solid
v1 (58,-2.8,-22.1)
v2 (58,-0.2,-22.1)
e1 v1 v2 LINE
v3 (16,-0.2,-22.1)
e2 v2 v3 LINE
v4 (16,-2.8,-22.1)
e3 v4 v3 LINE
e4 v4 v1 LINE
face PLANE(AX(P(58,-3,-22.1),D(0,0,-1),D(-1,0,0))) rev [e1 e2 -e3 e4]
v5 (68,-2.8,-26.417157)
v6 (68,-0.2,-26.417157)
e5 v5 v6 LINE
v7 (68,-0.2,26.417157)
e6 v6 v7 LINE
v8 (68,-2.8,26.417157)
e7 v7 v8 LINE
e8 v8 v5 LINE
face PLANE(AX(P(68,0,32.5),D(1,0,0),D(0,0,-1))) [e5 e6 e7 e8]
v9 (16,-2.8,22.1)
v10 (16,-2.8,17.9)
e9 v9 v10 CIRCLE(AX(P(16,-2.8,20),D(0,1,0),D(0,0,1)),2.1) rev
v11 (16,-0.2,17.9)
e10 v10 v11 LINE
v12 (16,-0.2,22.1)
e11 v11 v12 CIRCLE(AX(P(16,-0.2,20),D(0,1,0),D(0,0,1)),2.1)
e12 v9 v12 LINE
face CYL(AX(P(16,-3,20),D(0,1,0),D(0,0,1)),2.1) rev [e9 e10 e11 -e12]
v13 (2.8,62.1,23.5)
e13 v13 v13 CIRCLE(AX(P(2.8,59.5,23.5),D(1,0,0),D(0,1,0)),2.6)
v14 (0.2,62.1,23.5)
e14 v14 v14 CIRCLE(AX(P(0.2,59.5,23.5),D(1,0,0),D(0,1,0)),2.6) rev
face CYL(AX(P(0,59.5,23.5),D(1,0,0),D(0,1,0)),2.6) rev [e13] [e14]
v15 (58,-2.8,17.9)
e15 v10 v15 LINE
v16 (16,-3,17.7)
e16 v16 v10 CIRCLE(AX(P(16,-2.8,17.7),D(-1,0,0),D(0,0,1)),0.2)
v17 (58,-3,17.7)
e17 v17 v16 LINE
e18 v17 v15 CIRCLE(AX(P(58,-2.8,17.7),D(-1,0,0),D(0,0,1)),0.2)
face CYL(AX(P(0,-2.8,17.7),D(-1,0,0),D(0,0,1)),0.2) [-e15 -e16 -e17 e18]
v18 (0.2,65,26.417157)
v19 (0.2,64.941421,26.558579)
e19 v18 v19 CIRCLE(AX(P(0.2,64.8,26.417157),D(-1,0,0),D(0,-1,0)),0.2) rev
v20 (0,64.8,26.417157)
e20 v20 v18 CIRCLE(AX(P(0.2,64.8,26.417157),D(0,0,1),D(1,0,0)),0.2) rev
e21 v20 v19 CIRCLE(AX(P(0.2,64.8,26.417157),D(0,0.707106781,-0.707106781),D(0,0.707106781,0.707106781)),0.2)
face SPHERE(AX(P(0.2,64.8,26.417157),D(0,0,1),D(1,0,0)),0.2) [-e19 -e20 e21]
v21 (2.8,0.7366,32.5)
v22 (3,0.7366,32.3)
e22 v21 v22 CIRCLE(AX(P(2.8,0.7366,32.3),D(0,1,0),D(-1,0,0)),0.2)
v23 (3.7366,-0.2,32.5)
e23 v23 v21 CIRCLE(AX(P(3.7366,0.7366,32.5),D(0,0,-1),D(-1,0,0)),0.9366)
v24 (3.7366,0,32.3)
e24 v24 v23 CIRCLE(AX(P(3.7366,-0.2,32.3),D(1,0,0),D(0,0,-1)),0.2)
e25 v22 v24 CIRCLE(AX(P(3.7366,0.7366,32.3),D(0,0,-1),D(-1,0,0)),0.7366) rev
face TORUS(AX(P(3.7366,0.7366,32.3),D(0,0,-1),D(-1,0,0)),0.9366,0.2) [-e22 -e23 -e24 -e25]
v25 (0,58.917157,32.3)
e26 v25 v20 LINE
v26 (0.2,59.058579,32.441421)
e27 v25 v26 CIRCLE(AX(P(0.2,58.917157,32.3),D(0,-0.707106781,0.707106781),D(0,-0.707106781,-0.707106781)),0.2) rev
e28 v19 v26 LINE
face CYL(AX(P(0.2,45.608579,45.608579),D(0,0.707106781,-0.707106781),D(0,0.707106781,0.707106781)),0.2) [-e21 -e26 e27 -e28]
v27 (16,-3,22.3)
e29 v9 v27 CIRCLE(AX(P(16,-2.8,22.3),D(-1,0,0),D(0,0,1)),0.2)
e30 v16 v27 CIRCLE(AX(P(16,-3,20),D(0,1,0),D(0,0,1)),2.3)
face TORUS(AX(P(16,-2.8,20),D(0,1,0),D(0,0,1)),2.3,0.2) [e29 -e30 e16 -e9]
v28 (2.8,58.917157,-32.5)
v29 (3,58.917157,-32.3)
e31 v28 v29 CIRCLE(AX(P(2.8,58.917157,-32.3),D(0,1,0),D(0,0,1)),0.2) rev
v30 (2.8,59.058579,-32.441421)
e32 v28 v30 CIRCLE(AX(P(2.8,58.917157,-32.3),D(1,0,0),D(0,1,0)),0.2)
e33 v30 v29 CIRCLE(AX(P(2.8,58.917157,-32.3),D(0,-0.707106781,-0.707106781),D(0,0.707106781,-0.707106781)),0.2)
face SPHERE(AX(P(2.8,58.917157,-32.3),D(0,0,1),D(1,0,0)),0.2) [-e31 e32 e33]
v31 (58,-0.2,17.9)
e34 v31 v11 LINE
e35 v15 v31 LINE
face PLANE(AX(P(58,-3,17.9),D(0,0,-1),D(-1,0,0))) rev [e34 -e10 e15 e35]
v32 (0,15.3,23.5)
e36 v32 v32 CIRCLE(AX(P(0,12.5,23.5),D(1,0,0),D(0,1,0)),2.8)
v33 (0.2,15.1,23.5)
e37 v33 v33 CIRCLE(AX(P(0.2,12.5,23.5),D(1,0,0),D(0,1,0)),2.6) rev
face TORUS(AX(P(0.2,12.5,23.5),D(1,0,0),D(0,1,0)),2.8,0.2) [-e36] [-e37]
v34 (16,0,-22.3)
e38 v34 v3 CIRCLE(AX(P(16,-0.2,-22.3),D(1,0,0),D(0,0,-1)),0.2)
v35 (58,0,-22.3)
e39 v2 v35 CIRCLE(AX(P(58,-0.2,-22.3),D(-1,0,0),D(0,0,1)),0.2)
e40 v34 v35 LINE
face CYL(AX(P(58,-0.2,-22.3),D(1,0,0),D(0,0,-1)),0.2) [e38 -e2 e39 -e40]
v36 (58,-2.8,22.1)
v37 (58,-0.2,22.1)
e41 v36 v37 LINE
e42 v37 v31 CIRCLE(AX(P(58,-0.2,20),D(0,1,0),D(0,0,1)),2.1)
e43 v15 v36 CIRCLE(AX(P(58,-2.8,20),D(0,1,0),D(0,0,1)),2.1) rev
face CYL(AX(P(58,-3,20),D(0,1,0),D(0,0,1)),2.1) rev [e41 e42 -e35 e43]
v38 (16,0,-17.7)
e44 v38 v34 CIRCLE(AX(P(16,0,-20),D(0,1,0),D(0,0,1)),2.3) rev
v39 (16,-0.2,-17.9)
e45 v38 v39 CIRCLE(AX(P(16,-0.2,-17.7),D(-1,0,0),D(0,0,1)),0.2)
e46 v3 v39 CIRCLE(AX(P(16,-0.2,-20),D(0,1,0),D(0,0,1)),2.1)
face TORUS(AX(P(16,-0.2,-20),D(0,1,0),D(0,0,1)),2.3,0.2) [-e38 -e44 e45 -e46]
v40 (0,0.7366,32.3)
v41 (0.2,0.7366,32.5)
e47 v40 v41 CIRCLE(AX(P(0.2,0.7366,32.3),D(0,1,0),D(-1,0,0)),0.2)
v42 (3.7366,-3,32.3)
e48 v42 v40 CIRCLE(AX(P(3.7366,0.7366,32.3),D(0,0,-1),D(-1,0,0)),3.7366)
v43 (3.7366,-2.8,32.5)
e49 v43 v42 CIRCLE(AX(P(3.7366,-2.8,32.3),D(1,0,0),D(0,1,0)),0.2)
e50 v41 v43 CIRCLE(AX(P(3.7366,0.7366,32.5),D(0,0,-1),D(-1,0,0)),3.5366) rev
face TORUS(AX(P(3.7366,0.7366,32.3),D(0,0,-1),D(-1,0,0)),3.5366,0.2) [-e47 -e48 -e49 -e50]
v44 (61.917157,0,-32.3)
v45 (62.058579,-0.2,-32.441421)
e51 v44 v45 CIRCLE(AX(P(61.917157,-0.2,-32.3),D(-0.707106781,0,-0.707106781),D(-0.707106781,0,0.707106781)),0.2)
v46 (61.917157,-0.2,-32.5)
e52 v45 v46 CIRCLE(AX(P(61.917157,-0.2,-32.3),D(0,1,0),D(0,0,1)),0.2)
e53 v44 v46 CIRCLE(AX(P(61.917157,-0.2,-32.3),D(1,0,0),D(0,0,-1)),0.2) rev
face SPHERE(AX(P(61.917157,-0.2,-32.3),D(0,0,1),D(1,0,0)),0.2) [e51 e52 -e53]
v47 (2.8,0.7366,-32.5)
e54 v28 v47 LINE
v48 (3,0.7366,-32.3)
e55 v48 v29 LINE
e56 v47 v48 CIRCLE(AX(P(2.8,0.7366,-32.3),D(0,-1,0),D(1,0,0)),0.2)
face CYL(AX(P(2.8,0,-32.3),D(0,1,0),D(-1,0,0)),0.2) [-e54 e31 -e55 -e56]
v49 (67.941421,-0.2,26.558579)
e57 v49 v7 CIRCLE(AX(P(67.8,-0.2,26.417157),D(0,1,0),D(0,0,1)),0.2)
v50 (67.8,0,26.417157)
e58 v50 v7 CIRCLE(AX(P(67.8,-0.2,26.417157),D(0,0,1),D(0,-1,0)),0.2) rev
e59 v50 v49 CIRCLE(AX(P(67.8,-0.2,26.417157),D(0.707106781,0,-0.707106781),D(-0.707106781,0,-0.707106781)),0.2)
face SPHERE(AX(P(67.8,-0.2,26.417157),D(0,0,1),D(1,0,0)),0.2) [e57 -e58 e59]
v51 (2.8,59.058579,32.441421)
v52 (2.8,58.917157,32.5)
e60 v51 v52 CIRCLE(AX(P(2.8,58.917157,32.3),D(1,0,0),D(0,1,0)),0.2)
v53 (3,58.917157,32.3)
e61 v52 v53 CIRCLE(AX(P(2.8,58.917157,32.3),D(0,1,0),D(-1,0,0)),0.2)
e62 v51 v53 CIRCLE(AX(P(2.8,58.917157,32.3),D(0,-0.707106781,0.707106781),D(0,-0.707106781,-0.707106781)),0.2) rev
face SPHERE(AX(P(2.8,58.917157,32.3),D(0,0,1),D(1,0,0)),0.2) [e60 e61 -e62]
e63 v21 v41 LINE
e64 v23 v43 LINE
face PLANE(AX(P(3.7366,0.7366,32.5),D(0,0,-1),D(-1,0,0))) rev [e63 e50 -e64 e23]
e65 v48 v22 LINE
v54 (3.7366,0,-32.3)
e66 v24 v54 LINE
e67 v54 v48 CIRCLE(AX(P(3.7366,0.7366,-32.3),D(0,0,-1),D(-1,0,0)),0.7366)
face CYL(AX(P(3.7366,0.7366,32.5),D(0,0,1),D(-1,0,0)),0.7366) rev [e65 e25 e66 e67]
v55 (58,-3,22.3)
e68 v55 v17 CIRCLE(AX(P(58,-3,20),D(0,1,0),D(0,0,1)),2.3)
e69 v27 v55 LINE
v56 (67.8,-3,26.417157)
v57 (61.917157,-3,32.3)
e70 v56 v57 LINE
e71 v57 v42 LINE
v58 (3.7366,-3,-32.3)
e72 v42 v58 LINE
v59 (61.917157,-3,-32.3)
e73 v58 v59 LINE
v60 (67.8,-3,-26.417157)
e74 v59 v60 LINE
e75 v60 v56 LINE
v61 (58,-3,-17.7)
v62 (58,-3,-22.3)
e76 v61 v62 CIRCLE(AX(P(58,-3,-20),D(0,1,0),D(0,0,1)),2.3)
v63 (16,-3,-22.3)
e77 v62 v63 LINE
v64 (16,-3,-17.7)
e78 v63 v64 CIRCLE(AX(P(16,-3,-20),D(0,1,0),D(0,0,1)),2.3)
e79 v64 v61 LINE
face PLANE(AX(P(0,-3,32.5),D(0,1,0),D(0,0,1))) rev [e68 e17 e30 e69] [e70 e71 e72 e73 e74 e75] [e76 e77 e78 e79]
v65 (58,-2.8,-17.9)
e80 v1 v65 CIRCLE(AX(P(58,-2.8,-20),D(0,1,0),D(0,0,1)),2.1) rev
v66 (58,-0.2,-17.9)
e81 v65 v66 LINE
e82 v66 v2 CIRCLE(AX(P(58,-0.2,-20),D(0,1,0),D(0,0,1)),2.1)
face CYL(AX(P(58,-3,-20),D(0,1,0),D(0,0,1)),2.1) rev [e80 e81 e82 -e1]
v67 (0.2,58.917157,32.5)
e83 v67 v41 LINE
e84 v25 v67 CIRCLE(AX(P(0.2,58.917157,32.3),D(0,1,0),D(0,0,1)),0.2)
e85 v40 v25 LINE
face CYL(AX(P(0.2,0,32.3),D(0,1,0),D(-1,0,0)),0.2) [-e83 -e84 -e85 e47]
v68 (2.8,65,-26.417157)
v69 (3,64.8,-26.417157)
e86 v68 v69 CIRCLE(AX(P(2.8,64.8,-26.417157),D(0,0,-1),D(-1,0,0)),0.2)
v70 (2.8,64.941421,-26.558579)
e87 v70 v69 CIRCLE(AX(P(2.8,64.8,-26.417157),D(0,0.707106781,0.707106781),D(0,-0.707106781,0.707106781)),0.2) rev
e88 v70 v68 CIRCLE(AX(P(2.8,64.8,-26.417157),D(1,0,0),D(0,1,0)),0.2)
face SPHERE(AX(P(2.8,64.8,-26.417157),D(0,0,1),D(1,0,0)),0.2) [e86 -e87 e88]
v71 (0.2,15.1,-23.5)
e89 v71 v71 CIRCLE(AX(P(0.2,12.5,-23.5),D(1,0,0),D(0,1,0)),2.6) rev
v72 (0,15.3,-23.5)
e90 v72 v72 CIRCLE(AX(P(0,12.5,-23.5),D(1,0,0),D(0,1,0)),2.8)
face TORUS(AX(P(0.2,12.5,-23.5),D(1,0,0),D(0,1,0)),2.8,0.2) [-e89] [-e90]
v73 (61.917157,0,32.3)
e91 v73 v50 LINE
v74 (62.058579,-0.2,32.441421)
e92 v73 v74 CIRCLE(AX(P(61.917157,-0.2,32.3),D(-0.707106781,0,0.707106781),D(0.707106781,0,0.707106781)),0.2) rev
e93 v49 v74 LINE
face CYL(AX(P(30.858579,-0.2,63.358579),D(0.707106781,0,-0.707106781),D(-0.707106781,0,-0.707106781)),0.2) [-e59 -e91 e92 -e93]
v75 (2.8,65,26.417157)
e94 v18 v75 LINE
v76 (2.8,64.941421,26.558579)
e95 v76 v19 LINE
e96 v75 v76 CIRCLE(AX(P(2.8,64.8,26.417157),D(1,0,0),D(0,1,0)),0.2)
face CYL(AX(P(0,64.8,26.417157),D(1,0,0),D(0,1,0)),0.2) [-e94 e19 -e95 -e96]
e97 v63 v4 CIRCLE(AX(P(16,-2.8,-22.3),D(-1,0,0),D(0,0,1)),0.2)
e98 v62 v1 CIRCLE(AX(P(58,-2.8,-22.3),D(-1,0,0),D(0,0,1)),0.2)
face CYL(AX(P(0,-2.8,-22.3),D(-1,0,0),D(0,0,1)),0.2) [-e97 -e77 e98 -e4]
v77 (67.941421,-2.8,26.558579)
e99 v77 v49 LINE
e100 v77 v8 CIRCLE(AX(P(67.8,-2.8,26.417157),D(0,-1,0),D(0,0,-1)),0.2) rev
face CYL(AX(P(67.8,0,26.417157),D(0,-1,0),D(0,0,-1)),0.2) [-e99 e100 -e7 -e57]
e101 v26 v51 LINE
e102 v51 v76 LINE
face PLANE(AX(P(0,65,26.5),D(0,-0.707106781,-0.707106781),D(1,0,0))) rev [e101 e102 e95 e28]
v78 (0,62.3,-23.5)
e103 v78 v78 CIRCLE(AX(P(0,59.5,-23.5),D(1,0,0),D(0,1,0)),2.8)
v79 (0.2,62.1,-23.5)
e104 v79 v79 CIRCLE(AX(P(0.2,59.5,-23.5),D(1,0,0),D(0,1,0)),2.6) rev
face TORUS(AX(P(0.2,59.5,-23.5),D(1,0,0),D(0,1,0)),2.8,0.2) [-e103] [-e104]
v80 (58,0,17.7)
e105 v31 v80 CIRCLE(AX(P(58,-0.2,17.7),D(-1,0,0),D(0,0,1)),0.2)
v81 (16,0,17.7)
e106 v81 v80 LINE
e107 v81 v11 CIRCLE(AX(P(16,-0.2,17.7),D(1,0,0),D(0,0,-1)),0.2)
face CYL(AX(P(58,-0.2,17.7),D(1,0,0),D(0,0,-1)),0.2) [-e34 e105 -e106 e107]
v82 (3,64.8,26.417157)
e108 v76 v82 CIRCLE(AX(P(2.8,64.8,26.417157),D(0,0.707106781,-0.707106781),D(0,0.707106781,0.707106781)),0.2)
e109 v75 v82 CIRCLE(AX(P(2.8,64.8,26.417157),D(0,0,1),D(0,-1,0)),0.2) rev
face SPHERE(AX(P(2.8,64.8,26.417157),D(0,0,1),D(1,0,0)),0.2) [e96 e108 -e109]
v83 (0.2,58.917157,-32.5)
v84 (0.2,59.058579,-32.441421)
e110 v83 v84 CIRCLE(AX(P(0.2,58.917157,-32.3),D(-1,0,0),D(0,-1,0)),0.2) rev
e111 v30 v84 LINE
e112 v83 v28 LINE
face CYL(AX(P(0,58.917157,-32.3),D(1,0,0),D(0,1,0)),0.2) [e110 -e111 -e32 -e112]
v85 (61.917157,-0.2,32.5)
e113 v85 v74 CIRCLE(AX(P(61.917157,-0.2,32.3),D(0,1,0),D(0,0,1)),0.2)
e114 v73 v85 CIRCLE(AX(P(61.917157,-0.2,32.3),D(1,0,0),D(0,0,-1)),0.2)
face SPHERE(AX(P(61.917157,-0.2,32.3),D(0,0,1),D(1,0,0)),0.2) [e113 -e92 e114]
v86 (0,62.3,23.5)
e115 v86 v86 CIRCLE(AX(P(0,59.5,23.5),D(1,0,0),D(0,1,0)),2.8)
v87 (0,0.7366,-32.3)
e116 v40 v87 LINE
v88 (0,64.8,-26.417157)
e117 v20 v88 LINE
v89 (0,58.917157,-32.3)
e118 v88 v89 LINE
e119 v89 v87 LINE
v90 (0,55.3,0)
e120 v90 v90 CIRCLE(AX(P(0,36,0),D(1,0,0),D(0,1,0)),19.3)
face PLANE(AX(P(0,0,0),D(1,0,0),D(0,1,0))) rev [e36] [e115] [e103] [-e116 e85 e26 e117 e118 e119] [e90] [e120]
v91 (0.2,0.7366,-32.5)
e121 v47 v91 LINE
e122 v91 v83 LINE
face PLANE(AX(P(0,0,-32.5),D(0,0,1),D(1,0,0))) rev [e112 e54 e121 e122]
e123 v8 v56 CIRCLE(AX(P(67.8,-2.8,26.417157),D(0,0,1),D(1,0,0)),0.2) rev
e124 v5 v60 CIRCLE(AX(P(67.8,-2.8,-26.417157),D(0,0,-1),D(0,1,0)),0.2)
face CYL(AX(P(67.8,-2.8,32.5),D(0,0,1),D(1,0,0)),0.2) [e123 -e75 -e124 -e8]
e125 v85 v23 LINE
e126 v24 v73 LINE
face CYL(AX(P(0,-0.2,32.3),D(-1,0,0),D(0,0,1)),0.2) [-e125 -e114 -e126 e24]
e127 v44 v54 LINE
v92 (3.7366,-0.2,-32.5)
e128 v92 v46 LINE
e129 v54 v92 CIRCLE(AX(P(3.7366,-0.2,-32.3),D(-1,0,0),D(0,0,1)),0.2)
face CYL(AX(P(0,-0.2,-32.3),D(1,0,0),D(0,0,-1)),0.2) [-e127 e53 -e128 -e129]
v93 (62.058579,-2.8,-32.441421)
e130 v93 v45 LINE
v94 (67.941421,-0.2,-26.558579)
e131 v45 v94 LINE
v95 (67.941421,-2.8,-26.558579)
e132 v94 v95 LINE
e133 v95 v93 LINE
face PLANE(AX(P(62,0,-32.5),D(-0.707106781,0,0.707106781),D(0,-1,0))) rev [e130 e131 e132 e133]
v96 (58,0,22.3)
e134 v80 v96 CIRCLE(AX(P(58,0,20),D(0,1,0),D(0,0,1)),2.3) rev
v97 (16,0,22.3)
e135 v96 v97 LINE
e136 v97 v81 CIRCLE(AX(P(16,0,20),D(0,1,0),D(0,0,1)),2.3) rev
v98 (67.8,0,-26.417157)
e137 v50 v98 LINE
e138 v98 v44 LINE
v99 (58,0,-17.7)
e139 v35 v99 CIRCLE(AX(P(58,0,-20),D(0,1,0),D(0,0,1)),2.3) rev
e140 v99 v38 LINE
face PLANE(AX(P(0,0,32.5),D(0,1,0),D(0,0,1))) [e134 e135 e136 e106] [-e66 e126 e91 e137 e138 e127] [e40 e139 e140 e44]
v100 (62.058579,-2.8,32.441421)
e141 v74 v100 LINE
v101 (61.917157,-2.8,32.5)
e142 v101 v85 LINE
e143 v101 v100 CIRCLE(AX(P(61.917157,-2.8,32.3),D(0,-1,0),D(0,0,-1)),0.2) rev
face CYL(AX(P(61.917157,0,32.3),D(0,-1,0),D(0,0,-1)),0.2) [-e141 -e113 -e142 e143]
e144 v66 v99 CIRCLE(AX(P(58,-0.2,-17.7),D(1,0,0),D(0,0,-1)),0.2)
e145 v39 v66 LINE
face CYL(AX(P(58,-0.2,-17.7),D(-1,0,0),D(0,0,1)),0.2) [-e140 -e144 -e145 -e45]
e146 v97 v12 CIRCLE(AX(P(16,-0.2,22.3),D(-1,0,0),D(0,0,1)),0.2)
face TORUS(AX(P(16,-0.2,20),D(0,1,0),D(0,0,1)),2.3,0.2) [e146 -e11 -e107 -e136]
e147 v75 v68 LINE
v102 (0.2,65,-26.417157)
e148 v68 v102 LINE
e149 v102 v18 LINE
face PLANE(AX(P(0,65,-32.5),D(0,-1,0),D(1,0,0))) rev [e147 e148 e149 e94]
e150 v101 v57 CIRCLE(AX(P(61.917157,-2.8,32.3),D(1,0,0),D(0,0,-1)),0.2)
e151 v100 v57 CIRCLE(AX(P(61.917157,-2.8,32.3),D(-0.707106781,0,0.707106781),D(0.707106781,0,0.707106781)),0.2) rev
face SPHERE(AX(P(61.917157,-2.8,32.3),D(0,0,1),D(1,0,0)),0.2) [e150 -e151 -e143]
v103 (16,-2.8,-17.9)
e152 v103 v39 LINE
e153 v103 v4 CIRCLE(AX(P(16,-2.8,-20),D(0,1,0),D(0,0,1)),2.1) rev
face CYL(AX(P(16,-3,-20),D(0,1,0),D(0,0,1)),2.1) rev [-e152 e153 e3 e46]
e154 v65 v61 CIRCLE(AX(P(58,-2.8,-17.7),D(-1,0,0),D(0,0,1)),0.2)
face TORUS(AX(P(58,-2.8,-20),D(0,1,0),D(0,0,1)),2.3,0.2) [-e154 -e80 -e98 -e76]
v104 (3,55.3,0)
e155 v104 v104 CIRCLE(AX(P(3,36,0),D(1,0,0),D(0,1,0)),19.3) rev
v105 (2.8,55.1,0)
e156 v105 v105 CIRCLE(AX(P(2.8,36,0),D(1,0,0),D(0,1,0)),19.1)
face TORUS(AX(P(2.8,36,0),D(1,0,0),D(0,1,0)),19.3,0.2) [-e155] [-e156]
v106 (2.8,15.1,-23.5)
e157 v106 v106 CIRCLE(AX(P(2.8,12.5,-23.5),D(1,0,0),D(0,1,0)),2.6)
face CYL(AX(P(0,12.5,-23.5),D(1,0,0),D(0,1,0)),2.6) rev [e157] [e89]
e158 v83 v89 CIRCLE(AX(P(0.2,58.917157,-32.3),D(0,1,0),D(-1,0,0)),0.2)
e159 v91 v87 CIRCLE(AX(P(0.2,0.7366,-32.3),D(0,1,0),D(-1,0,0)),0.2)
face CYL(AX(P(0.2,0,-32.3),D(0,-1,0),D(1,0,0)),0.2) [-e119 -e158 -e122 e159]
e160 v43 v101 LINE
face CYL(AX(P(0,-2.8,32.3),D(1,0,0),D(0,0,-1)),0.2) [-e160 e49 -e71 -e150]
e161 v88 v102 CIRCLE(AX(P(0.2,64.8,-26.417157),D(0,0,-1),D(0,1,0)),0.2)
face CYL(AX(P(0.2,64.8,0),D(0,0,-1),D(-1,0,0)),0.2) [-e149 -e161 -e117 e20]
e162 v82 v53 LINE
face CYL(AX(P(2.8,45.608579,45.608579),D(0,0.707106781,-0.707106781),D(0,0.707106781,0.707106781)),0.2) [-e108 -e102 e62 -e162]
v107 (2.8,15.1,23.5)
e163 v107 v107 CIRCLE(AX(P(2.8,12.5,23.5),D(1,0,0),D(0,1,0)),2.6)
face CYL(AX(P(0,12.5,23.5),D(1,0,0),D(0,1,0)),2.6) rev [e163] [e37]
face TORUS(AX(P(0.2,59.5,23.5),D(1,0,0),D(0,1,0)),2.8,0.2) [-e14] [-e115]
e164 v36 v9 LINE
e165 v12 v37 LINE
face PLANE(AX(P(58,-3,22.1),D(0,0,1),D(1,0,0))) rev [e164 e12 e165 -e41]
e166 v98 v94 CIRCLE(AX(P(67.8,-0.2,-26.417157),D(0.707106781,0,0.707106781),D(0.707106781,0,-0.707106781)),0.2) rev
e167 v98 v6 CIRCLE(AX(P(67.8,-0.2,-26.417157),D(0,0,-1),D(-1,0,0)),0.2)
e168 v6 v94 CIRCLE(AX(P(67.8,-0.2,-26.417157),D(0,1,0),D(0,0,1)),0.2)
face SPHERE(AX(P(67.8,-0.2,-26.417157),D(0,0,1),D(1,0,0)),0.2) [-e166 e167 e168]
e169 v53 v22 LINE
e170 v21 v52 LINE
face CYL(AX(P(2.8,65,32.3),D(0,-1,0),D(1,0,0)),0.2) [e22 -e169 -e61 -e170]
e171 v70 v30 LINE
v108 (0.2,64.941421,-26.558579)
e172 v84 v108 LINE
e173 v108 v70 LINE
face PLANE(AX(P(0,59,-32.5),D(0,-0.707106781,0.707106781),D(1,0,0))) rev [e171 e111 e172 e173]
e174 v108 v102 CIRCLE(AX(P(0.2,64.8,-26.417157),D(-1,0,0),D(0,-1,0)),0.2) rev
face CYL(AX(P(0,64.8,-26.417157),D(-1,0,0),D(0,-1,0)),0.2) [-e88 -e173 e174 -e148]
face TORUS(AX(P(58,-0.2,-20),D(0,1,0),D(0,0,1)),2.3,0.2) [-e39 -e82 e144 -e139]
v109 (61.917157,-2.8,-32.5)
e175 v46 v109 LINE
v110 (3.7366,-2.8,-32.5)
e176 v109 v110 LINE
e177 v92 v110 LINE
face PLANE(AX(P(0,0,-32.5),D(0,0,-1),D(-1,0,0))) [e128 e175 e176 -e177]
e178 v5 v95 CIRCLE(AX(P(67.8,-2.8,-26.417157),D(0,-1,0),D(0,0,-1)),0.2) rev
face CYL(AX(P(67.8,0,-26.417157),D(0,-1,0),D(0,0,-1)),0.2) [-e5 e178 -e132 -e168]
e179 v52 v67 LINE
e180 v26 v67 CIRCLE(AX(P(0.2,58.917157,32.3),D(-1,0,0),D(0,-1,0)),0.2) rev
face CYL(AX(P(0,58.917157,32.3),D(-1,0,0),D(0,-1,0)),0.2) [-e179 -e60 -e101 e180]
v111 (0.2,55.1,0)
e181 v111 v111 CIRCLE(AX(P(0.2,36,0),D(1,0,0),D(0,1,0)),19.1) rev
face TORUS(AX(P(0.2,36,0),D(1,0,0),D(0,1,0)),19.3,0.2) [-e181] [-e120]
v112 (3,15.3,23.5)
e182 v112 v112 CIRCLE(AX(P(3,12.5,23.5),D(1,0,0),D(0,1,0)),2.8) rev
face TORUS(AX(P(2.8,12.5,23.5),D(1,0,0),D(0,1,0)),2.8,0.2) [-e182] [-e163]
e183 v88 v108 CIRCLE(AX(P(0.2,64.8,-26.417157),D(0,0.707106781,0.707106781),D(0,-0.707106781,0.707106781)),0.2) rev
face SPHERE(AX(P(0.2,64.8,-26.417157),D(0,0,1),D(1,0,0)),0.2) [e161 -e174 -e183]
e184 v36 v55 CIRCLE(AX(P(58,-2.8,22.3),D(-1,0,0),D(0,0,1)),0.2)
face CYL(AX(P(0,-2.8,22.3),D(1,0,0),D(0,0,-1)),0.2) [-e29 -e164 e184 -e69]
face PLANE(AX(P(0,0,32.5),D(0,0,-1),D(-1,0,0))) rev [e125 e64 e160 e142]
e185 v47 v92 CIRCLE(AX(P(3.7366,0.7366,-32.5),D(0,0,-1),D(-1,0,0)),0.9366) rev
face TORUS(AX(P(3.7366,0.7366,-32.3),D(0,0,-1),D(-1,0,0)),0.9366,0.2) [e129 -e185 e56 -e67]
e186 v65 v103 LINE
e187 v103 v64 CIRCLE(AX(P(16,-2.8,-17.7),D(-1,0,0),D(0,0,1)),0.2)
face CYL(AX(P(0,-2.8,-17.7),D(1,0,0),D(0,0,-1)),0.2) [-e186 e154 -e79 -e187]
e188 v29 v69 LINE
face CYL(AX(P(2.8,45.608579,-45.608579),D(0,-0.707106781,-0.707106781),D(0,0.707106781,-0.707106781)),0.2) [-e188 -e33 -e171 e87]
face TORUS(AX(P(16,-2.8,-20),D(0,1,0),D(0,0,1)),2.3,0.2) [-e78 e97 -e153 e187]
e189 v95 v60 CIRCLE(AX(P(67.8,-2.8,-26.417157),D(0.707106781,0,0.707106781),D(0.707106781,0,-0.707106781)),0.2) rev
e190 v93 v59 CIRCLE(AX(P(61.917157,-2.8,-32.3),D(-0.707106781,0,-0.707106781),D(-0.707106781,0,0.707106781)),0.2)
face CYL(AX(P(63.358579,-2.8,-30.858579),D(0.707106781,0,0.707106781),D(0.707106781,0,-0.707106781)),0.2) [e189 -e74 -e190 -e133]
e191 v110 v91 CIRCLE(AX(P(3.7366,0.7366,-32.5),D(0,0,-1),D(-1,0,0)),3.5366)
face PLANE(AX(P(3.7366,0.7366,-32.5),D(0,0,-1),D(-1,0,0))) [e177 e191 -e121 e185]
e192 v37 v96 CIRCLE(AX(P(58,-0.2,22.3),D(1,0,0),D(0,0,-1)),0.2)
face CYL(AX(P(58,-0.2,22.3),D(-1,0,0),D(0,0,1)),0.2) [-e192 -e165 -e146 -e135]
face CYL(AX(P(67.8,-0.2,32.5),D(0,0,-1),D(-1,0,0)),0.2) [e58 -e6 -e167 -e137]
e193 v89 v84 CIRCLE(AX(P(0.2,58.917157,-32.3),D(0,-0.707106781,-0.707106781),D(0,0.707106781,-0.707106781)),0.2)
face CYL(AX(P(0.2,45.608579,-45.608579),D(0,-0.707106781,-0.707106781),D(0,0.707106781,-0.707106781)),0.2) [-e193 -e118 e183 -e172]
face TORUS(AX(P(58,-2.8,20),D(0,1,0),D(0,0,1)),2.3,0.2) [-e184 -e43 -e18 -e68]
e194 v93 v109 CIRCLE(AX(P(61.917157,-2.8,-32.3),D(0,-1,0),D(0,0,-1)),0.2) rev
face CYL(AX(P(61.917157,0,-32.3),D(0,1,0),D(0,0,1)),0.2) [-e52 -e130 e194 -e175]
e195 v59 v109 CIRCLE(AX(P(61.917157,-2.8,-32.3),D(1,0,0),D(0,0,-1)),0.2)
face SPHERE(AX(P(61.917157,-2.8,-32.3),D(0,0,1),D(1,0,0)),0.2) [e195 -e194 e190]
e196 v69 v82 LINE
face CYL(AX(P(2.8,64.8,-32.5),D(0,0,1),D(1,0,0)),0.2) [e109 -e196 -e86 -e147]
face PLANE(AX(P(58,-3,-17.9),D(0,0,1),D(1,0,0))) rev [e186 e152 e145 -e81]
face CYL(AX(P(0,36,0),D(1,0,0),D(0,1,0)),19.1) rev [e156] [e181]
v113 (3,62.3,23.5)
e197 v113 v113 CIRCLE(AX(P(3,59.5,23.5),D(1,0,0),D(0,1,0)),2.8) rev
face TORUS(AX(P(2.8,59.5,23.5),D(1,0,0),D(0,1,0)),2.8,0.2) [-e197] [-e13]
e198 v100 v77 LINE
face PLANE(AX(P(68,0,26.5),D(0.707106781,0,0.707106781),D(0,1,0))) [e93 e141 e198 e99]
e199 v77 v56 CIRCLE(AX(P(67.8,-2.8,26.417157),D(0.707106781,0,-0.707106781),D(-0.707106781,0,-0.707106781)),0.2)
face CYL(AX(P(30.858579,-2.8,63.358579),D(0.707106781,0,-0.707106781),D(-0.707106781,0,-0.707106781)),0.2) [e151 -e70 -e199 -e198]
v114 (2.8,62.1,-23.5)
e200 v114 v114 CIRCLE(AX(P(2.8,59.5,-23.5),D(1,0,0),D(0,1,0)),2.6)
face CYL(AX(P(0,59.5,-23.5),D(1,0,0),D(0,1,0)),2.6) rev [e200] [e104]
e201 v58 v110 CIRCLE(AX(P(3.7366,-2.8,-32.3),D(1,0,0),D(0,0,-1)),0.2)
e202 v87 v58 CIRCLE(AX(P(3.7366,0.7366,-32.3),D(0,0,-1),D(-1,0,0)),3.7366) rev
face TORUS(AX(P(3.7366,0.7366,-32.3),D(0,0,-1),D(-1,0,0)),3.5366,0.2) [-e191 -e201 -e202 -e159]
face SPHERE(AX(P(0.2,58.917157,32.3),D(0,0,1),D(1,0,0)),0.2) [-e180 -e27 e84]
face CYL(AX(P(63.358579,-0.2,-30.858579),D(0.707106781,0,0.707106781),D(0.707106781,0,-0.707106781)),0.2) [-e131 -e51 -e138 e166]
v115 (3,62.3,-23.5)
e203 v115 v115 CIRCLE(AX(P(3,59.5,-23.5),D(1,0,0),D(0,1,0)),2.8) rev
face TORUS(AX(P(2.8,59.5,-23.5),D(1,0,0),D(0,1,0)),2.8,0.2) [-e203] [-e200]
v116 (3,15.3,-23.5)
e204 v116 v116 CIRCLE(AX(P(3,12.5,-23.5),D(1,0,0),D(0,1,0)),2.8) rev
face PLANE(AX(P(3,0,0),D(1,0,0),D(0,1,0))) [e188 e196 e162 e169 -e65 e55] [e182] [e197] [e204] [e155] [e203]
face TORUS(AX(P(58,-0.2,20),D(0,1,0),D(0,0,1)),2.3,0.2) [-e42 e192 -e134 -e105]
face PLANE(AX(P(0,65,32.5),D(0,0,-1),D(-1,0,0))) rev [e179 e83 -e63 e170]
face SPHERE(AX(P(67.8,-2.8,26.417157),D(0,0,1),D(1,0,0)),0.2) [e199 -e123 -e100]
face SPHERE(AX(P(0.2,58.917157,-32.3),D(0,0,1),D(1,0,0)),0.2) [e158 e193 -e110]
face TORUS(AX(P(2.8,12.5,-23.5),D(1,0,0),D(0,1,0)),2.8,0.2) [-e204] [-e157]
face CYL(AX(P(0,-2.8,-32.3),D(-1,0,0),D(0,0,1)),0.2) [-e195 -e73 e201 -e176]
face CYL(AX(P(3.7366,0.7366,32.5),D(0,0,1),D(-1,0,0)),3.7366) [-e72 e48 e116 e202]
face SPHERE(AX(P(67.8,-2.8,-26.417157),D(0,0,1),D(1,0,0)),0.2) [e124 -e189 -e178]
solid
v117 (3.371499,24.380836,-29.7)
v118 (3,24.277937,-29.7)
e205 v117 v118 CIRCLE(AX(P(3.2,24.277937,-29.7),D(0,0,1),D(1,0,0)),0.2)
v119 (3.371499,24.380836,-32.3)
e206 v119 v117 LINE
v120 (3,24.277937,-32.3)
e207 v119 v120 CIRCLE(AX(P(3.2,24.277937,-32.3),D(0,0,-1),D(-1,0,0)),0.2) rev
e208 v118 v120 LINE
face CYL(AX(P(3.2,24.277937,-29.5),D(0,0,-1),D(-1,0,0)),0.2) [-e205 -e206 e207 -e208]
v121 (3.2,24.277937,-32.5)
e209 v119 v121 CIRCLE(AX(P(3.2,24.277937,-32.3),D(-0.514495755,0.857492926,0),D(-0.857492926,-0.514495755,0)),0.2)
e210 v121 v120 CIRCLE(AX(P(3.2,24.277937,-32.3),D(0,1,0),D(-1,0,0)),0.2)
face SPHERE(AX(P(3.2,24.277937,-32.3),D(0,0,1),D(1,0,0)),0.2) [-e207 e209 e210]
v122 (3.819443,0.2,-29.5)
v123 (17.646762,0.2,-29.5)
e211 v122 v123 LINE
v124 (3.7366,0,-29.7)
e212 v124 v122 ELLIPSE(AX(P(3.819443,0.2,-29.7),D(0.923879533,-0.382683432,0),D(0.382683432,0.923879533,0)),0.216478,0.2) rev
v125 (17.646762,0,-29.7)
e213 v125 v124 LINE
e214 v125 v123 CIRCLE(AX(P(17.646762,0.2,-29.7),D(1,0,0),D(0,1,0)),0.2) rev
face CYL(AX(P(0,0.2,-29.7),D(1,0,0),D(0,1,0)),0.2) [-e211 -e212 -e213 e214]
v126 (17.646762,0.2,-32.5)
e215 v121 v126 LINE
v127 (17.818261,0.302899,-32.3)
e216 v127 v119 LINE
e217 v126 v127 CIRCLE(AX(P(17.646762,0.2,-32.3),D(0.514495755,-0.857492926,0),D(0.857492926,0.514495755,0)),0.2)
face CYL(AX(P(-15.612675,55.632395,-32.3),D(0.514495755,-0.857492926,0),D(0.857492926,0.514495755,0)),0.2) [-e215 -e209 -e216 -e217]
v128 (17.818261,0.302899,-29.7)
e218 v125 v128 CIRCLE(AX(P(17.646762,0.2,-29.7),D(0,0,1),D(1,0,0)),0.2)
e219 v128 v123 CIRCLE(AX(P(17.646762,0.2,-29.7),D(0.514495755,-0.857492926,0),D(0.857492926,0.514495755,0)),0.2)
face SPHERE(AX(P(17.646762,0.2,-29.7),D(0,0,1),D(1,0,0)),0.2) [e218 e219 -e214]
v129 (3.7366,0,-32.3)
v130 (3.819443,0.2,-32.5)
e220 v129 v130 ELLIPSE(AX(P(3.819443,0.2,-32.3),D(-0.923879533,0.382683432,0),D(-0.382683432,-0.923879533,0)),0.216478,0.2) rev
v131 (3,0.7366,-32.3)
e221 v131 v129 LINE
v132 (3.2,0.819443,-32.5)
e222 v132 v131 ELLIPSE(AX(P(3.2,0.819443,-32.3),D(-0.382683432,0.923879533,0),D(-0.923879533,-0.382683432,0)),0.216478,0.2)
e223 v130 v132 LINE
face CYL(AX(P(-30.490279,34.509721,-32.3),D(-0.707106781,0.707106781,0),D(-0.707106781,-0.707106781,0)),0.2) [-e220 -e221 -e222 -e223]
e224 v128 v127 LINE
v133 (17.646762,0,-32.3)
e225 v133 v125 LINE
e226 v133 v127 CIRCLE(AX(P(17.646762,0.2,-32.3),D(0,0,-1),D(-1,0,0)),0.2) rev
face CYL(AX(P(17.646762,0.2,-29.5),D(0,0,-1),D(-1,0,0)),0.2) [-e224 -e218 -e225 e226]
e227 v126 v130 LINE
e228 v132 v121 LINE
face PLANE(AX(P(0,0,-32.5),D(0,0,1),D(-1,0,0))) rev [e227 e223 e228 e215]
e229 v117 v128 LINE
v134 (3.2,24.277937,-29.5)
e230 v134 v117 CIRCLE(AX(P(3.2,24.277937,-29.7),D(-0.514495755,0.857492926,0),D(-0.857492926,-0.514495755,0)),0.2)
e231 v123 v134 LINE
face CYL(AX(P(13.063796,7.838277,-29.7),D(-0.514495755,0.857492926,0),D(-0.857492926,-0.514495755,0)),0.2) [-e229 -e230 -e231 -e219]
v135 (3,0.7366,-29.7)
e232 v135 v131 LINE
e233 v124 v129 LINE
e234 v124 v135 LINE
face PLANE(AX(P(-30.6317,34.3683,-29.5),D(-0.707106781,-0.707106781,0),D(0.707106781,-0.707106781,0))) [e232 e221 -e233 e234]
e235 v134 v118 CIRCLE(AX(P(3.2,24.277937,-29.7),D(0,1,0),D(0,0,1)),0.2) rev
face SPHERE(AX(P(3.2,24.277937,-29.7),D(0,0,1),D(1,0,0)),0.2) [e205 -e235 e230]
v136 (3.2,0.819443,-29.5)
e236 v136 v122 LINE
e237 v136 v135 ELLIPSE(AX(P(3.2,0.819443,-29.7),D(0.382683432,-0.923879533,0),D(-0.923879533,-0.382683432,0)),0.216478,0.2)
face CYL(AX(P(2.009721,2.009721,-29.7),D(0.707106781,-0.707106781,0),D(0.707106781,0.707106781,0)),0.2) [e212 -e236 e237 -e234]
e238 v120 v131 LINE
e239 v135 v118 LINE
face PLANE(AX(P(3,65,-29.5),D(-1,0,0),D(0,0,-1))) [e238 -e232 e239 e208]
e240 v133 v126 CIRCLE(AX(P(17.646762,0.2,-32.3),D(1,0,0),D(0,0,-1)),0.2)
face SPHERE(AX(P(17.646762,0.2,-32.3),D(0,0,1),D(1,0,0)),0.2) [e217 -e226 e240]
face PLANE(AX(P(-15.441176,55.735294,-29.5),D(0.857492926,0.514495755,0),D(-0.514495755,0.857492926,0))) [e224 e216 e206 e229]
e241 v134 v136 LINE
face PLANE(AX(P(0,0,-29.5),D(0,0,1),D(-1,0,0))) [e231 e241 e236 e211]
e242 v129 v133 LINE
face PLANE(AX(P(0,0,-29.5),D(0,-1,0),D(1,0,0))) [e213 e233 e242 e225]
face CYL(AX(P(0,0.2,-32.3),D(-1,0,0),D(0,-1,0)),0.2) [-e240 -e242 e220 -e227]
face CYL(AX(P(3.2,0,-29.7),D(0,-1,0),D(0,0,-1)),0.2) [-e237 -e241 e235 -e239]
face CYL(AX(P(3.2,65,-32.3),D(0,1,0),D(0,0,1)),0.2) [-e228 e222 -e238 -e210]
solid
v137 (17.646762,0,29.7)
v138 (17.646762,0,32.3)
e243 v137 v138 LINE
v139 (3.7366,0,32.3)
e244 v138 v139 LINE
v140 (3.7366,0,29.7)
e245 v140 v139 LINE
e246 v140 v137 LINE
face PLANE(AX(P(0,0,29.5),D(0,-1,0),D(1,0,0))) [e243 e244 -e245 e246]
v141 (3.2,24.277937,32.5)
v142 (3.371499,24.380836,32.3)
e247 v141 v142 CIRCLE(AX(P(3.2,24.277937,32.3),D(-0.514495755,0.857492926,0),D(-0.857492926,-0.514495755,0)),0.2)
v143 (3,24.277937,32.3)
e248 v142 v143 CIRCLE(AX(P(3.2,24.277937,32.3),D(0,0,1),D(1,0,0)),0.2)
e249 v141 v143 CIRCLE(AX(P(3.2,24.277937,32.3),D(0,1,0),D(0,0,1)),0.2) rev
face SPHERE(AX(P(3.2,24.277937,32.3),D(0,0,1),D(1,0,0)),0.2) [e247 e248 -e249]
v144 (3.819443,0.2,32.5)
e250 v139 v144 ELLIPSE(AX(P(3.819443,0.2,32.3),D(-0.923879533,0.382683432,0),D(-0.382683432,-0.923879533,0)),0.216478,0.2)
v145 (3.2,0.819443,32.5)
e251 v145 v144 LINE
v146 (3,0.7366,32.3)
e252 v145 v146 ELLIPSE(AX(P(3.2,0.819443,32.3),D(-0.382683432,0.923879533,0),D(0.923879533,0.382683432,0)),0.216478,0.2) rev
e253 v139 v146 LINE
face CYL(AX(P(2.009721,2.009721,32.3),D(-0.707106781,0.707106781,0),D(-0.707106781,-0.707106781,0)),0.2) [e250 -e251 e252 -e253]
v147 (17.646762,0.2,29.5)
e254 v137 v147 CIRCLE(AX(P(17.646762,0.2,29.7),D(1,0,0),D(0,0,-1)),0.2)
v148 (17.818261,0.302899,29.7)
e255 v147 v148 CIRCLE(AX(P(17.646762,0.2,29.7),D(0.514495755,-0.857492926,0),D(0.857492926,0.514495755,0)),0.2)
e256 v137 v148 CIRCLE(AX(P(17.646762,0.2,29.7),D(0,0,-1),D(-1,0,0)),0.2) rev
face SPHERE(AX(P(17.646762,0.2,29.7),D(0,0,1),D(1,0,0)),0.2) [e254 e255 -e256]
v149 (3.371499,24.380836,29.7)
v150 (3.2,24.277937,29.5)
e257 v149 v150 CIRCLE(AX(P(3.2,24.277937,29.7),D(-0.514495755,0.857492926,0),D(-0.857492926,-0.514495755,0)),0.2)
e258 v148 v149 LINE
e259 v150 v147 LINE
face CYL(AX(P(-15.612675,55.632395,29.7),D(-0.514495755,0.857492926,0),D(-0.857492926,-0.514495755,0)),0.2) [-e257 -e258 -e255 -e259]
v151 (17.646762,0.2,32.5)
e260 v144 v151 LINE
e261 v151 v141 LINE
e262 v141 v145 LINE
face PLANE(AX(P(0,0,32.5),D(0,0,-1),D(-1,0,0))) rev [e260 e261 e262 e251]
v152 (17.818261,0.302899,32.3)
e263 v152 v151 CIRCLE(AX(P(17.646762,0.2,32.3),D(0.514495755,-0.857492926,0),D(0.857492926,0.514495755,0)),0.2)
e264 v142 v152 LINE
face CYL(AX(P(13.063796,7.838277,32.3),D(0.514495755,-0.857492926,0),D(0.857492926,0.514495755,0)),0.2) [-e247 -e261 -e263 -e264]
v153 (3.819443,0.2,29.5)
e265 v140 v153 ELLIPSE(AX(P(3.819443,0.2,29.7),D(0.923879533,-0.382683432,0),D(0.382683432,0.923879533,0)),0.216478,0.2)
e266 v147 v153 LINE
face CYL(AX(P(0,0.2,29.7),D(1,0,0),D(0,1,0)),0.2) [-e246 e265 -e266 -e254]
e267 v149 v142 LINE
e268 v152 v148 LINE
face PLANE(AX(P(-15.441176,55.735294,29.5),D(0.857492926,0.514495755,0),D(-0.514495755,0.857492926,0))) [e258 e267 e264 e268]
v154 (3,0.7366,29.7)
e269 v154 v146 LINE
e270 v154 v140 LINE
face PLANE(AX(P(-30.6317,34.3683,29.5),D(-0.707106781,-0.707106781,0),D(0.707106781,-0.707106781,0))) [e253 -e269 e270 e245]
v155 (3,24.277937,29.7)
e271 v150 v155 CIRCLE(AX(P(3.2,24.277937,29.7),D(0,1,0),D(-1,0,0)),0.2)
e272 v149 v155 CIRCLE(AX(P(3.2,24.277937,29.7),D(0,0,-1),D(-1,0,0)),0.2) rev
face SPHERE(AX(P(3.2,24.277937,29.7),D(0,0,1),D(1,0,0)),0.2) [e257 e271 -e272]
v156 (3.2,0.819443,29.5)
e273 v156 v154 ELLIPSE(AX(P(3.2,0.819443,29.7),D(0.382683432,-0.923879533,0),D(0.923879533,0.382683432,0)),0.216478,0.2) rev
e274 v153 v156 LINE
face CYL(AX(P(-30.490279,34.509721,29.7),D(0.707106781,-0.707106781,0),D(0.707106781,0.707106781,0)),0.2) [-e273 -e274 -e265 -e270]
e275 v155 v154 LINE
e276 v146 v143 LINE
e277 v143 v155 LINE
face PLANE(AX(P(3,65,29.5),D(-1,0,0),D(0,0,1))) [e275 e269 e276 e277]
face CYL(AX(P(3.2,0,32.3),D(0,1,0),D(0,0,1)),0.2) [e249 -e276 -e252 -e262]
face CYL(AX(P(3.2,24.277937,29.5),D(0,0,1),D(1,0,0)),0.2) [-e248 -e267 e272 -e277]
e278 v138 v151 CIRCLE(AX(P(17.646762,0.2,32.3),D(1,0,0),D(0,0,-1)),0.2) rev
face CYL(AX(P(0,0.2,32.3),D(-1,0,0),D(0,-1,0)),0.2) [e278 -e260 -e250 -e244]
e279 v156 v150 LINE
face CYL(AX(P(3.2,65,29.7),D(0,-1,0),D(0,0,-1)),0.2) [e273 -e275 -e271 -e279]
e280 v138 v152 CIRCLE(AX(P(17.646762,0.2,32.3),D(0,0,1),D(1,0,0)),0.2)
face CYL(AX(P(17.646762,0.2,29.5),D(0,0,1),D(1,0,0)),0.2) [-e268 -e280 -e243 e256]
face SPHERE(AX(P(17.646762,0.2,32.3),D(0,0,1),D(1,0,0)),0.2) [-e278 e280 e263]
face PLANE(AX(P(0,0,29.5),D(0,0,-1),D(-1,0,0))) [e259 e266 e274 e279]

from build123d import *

# Parameters (mm, degrees)
SCHIZZO1_W                     = 68
SCHIZZO1_H                     = 3
BASE_FLANGIA1_DEPTH            = 32.5
BORDO_FLANGIA1_STRIP_W         = 13.4732
BORDO_FLANGIA1_STRIP_H         = 3
BORDO_FLANGIA1_STRIP_CUT_DEPTH = 65
BORDO_FLANGIA1_DEPTH           = 65
SCHIZZO10_R                    = 19.1
SCHIZZO10_R_2                  = 2.6
TAGLIO_ESTRUSIONE1_DEPTH       = 98.5
TAGLIO_ESTRUSIONE3_DEPTH       = 100.525122457
ESTRUSIONE_ESTRUSIONE3_START   = 32.5
ESTRUSIONE_ESTRUSIONE3_DEPTH   = 3
SMUSSO1_SIZE                   = 6
RACCORDO1_R                    = 0.2
RACCORDO2_R                    = 0.2
RACCORDO3_R                    = 0.2


# Sheet-metal steps are written as plain solids
with BuildPart() as part:
    # Schizzo1 → Base-Flangia1 (new, symmetric)
    with BuildSketch(Plane.XY):
        with Locations((34, -1.5)):
            Rectangle(SCHIZZO1_W, SCHIZZO1_H)
    extrude(amount=BASE_FLANGIA1_DEPTH, both=True)

    # Bordo-Flangia1 strip (across the edge) → Bordo-Flangia1 strip cut (cut)
    with BuildSketch(Plane.XY.offset(-32.5)):
        with Locations((-3, -1.5)):
            Rectangle(BORDO_FLANGIA1_STRIP_W, BORDO_FLANGIA1_STRIP_H)
    extrude(amount=BORDO_FLANGIA1_STRIP_CUT_DEPTH, mode=Mode.SUBTRACT)

    # Bordo-Flangia1 section (across the edge) → Bordo-Flangia1 (add)
    with BuildSketch(Plane.XY.offset(-32.5)):
        with BuildLine():
            Line((0, 0.7366), (0, 65))
            Line((0, 65), (3, 65))
            Line((3, 65), (3, 0.7366))
            ThreePointArc((3, 0.7366), (3.215745145, 0.215745145), (3.7366, 0))
            Line((3.7366, 0), (3.7366, -3))
            ThreePointArc((3.7366, -3), (1.094424801, -1.905575199), (0, 0.7366))
        make_face()
    extrude(amount=BORDO_FLANGIA1_DEPTH)

    # Schizzo10 → Taglio-Estrusione1 (cut, through all)
    with BuildSketch(Plane(origin=(3, 0, 0), x_dir=(0, 0, -1), z_dir=(1, 0, 0))):
        with Locations(Location((0, 36, 0), (0, 0, 90))):
            Circle(SCHIZZO10_R)
        with Locations(Location((-23.5, 59.5, 0), (0, 0, 90))):
            Circle(SCHIZZO10_R_2)
        with Locations(Location((23.5, 59.5, 0), (0, 0, 270))):
            Circle(SCHIZZO10_R_2)
        with Locations(Location((-23.5, 12.5, 0), (0, 0, 270))):
            Circle(SCHIZZO10_R_2)
        with Locations(Location((23.5, 12.5, 0), (0, 0, 90))):
            Circle(SCHIZZO10_R_2)
    extrude(amount=-TAGLIO_ESTRUSIONE1_DEPTH, mode=Mode.SUBTRACT)

    # Schizzo12 → Taglio-Estrusione3 (cut, through all)
    with BuildSketch(Plane(origin=(0, 0, 0), x_dir=(1, 0, 0), z_dir=(0, 1, 0))):
        with BuildLine():
            Line((58, 17.9), (16, 17.9))
            ThreePointArc((16, 17.9), (13.9, 20), (16, 22.1))
            Line((16, 22.1), (58, 22.1))
            ThreePointArc((58, 22.1), (60.1, 20), (58, 17.9))
        make_face()
        with BuildLine():
            Line((58, -22.1), (16, -22.1))
            ThreePointArc((16, -22.1), (13.9, -20), (16, -17.9))
            Line((16, -17.9), (58, -17.9))
            ThreePointArc((58, -17.9), (60.1, -20), (58, -22.1))
        make_face()
    extrude(amount=-TAGLIO_ESTRUSIONE3_DEPTH, mode=Mode.SUBTRACT)

    # Smusso1
    smusso1_edges = [part.edges().sort_by_distance(p)[0] for p in [
        (1.5, 65, -32.5),
        (1.5, 65, 32.5),
        (68, -1.5, -32.5),
        (68, -1.5, 32.5),
    ]]
    chamfer(smusso1_edges, length=SMUSSO1_SIZE)

    # Raccordo1
    raccordo1_edges = [part.edges().sort_by_distance(p)[0] for p in [
        (68, 0, 0),
        (68, -3, 0),
        (68, -1.5, -26.5),
        (68, -1.5, 26.5),
        (65, -3, -29.5),
        (65, -3, 29.5),
        (62, -1.5, 32.5),
        (65, 0, -29.5),
        (65, 0, 29.5),
        (62, -1.5, -32.5),
        (0, 29.8683, -32.5),
        (3, 29.8683, -32.5),
        (1.5, 59, -32.5),
        (3, 65, 0),
        (3, 62, 29.5),
        (3, 62, -29.5),
        (32.8683, -3, -32.5),
        (0, 65, 0),
        (1.5, 65, 26.5),
        (1.5, 65, -26.5),
        (0, 62, 29.5),
        (32.8683, 0, -32.5),
        (0, 62, -29.5),
        (1.5, 59, 32.5),
        (32.8683, -3, 32.5),
        (32.8683, 0, 32.5),
        (1.094424801, -1.905575199, -32.5),
        (1.094424801, -1.905575199, 32.5),
        (3.215745145, 0.215745145, -32.5),
        (3.215745145, 0.215745145, 32.5),
        (3, 29.8683, 32.5),
        (0, 29.8683, 32.5),
        (0, 9.9, -23.5),
        (3, 9.9, -23.5),
        (0, 15.1, 23.5),
        (3, 15.1, 23.5),
        (0, 62.1, -23.5),
        (3, 62.1, -23.5),
        (0, 56.9, 23.5),
        (3, 56.9, 23.5),
        (0, 16.9, 0),
        (3, 16.9, 0),
        (60.1, -3, -20),
        (37, -3, -17.9),
        (13.9, -3, -20),
        (37, -3, -22.1),
        (60.1, 0, -20),
        (37, 0, -22.1),
        (13.9, 0, -20),
        (37, 0, -17.9),
        (60.1, -3, 20),
        (37, -3, 22.1),
        (13.9, -3, 20),
        (37, -3, 17.9),
        (60.1, 0, 20),
        (37, 0, 17.9),
        (13.9, 0, 20),
        (37, 0, 22.1),
    ]]
    fillet(raccordo1_edges, radius=RACCORDO1_R)


with BuildPart() as body_2:
    # Schizzo15 → Estrusione-Estrusione3 (new body)
    with BuildSketch(Plane.XY.offset(ESTRUSIONE_ESTRUSIONE3_START)):
        Polygon((3, 25), (18, 0), (3.7366, 0), (3, 0.7366), align=None)
    extrude(amount=-ESTRUSIONE_ESTRUSIONE3_DEPTH)


with BuildPart() as body_3:
    # Specchia5: mirrored copy
    add(body_2.part.mirror(Plane.XY))

    # Raccordo2
    raccordo2_edges = [body_3.edges().sort_by_distance(p)[0] for p in [
        (3, 12.8683, -29.5),
        (3.3683, 0.3683, -29.5),
        (10.8683, 0, -29.5),
        (3.3683, 0.3683, -32.5),
        (3, 12.8683, -32.5),
        (10.5, 12.5, -32.5),
        (10.8683, 0, -32.5),
        (10.5, 12.5, -29.5),
        (3, 25, -31),
        (18, 0, -31),
    ]]
    fillet(raccordo2_edges, radius=RACCORDO2_R)


with BuildPart() as body_2_1:
    add(body_2.part)

    # Raccordo3
    raccordo3_edges = [body_2_1.edges().sort_by_distance(p)[0] for p in [
        (3, 12.8683, 29.5),
        (3.3683, 0.3683, 29.5),
        (10.8683, 0, 29.5),
        (3.3683, 0.3683, 32.5),
        (3, 12.8683, 32.5),
        (10.5, 12.5, 32.5),
        (10.8683, 0, 32.5),
        (10.5, 12.5, 29.5),
        (3, 25, 31),
        (18, 0, 31),
    ]]
    fillet(raccordo3_edges, radius=RACCORDO3_R)


solid = Compound([part.part, body_3.part, body_2_1.part])
